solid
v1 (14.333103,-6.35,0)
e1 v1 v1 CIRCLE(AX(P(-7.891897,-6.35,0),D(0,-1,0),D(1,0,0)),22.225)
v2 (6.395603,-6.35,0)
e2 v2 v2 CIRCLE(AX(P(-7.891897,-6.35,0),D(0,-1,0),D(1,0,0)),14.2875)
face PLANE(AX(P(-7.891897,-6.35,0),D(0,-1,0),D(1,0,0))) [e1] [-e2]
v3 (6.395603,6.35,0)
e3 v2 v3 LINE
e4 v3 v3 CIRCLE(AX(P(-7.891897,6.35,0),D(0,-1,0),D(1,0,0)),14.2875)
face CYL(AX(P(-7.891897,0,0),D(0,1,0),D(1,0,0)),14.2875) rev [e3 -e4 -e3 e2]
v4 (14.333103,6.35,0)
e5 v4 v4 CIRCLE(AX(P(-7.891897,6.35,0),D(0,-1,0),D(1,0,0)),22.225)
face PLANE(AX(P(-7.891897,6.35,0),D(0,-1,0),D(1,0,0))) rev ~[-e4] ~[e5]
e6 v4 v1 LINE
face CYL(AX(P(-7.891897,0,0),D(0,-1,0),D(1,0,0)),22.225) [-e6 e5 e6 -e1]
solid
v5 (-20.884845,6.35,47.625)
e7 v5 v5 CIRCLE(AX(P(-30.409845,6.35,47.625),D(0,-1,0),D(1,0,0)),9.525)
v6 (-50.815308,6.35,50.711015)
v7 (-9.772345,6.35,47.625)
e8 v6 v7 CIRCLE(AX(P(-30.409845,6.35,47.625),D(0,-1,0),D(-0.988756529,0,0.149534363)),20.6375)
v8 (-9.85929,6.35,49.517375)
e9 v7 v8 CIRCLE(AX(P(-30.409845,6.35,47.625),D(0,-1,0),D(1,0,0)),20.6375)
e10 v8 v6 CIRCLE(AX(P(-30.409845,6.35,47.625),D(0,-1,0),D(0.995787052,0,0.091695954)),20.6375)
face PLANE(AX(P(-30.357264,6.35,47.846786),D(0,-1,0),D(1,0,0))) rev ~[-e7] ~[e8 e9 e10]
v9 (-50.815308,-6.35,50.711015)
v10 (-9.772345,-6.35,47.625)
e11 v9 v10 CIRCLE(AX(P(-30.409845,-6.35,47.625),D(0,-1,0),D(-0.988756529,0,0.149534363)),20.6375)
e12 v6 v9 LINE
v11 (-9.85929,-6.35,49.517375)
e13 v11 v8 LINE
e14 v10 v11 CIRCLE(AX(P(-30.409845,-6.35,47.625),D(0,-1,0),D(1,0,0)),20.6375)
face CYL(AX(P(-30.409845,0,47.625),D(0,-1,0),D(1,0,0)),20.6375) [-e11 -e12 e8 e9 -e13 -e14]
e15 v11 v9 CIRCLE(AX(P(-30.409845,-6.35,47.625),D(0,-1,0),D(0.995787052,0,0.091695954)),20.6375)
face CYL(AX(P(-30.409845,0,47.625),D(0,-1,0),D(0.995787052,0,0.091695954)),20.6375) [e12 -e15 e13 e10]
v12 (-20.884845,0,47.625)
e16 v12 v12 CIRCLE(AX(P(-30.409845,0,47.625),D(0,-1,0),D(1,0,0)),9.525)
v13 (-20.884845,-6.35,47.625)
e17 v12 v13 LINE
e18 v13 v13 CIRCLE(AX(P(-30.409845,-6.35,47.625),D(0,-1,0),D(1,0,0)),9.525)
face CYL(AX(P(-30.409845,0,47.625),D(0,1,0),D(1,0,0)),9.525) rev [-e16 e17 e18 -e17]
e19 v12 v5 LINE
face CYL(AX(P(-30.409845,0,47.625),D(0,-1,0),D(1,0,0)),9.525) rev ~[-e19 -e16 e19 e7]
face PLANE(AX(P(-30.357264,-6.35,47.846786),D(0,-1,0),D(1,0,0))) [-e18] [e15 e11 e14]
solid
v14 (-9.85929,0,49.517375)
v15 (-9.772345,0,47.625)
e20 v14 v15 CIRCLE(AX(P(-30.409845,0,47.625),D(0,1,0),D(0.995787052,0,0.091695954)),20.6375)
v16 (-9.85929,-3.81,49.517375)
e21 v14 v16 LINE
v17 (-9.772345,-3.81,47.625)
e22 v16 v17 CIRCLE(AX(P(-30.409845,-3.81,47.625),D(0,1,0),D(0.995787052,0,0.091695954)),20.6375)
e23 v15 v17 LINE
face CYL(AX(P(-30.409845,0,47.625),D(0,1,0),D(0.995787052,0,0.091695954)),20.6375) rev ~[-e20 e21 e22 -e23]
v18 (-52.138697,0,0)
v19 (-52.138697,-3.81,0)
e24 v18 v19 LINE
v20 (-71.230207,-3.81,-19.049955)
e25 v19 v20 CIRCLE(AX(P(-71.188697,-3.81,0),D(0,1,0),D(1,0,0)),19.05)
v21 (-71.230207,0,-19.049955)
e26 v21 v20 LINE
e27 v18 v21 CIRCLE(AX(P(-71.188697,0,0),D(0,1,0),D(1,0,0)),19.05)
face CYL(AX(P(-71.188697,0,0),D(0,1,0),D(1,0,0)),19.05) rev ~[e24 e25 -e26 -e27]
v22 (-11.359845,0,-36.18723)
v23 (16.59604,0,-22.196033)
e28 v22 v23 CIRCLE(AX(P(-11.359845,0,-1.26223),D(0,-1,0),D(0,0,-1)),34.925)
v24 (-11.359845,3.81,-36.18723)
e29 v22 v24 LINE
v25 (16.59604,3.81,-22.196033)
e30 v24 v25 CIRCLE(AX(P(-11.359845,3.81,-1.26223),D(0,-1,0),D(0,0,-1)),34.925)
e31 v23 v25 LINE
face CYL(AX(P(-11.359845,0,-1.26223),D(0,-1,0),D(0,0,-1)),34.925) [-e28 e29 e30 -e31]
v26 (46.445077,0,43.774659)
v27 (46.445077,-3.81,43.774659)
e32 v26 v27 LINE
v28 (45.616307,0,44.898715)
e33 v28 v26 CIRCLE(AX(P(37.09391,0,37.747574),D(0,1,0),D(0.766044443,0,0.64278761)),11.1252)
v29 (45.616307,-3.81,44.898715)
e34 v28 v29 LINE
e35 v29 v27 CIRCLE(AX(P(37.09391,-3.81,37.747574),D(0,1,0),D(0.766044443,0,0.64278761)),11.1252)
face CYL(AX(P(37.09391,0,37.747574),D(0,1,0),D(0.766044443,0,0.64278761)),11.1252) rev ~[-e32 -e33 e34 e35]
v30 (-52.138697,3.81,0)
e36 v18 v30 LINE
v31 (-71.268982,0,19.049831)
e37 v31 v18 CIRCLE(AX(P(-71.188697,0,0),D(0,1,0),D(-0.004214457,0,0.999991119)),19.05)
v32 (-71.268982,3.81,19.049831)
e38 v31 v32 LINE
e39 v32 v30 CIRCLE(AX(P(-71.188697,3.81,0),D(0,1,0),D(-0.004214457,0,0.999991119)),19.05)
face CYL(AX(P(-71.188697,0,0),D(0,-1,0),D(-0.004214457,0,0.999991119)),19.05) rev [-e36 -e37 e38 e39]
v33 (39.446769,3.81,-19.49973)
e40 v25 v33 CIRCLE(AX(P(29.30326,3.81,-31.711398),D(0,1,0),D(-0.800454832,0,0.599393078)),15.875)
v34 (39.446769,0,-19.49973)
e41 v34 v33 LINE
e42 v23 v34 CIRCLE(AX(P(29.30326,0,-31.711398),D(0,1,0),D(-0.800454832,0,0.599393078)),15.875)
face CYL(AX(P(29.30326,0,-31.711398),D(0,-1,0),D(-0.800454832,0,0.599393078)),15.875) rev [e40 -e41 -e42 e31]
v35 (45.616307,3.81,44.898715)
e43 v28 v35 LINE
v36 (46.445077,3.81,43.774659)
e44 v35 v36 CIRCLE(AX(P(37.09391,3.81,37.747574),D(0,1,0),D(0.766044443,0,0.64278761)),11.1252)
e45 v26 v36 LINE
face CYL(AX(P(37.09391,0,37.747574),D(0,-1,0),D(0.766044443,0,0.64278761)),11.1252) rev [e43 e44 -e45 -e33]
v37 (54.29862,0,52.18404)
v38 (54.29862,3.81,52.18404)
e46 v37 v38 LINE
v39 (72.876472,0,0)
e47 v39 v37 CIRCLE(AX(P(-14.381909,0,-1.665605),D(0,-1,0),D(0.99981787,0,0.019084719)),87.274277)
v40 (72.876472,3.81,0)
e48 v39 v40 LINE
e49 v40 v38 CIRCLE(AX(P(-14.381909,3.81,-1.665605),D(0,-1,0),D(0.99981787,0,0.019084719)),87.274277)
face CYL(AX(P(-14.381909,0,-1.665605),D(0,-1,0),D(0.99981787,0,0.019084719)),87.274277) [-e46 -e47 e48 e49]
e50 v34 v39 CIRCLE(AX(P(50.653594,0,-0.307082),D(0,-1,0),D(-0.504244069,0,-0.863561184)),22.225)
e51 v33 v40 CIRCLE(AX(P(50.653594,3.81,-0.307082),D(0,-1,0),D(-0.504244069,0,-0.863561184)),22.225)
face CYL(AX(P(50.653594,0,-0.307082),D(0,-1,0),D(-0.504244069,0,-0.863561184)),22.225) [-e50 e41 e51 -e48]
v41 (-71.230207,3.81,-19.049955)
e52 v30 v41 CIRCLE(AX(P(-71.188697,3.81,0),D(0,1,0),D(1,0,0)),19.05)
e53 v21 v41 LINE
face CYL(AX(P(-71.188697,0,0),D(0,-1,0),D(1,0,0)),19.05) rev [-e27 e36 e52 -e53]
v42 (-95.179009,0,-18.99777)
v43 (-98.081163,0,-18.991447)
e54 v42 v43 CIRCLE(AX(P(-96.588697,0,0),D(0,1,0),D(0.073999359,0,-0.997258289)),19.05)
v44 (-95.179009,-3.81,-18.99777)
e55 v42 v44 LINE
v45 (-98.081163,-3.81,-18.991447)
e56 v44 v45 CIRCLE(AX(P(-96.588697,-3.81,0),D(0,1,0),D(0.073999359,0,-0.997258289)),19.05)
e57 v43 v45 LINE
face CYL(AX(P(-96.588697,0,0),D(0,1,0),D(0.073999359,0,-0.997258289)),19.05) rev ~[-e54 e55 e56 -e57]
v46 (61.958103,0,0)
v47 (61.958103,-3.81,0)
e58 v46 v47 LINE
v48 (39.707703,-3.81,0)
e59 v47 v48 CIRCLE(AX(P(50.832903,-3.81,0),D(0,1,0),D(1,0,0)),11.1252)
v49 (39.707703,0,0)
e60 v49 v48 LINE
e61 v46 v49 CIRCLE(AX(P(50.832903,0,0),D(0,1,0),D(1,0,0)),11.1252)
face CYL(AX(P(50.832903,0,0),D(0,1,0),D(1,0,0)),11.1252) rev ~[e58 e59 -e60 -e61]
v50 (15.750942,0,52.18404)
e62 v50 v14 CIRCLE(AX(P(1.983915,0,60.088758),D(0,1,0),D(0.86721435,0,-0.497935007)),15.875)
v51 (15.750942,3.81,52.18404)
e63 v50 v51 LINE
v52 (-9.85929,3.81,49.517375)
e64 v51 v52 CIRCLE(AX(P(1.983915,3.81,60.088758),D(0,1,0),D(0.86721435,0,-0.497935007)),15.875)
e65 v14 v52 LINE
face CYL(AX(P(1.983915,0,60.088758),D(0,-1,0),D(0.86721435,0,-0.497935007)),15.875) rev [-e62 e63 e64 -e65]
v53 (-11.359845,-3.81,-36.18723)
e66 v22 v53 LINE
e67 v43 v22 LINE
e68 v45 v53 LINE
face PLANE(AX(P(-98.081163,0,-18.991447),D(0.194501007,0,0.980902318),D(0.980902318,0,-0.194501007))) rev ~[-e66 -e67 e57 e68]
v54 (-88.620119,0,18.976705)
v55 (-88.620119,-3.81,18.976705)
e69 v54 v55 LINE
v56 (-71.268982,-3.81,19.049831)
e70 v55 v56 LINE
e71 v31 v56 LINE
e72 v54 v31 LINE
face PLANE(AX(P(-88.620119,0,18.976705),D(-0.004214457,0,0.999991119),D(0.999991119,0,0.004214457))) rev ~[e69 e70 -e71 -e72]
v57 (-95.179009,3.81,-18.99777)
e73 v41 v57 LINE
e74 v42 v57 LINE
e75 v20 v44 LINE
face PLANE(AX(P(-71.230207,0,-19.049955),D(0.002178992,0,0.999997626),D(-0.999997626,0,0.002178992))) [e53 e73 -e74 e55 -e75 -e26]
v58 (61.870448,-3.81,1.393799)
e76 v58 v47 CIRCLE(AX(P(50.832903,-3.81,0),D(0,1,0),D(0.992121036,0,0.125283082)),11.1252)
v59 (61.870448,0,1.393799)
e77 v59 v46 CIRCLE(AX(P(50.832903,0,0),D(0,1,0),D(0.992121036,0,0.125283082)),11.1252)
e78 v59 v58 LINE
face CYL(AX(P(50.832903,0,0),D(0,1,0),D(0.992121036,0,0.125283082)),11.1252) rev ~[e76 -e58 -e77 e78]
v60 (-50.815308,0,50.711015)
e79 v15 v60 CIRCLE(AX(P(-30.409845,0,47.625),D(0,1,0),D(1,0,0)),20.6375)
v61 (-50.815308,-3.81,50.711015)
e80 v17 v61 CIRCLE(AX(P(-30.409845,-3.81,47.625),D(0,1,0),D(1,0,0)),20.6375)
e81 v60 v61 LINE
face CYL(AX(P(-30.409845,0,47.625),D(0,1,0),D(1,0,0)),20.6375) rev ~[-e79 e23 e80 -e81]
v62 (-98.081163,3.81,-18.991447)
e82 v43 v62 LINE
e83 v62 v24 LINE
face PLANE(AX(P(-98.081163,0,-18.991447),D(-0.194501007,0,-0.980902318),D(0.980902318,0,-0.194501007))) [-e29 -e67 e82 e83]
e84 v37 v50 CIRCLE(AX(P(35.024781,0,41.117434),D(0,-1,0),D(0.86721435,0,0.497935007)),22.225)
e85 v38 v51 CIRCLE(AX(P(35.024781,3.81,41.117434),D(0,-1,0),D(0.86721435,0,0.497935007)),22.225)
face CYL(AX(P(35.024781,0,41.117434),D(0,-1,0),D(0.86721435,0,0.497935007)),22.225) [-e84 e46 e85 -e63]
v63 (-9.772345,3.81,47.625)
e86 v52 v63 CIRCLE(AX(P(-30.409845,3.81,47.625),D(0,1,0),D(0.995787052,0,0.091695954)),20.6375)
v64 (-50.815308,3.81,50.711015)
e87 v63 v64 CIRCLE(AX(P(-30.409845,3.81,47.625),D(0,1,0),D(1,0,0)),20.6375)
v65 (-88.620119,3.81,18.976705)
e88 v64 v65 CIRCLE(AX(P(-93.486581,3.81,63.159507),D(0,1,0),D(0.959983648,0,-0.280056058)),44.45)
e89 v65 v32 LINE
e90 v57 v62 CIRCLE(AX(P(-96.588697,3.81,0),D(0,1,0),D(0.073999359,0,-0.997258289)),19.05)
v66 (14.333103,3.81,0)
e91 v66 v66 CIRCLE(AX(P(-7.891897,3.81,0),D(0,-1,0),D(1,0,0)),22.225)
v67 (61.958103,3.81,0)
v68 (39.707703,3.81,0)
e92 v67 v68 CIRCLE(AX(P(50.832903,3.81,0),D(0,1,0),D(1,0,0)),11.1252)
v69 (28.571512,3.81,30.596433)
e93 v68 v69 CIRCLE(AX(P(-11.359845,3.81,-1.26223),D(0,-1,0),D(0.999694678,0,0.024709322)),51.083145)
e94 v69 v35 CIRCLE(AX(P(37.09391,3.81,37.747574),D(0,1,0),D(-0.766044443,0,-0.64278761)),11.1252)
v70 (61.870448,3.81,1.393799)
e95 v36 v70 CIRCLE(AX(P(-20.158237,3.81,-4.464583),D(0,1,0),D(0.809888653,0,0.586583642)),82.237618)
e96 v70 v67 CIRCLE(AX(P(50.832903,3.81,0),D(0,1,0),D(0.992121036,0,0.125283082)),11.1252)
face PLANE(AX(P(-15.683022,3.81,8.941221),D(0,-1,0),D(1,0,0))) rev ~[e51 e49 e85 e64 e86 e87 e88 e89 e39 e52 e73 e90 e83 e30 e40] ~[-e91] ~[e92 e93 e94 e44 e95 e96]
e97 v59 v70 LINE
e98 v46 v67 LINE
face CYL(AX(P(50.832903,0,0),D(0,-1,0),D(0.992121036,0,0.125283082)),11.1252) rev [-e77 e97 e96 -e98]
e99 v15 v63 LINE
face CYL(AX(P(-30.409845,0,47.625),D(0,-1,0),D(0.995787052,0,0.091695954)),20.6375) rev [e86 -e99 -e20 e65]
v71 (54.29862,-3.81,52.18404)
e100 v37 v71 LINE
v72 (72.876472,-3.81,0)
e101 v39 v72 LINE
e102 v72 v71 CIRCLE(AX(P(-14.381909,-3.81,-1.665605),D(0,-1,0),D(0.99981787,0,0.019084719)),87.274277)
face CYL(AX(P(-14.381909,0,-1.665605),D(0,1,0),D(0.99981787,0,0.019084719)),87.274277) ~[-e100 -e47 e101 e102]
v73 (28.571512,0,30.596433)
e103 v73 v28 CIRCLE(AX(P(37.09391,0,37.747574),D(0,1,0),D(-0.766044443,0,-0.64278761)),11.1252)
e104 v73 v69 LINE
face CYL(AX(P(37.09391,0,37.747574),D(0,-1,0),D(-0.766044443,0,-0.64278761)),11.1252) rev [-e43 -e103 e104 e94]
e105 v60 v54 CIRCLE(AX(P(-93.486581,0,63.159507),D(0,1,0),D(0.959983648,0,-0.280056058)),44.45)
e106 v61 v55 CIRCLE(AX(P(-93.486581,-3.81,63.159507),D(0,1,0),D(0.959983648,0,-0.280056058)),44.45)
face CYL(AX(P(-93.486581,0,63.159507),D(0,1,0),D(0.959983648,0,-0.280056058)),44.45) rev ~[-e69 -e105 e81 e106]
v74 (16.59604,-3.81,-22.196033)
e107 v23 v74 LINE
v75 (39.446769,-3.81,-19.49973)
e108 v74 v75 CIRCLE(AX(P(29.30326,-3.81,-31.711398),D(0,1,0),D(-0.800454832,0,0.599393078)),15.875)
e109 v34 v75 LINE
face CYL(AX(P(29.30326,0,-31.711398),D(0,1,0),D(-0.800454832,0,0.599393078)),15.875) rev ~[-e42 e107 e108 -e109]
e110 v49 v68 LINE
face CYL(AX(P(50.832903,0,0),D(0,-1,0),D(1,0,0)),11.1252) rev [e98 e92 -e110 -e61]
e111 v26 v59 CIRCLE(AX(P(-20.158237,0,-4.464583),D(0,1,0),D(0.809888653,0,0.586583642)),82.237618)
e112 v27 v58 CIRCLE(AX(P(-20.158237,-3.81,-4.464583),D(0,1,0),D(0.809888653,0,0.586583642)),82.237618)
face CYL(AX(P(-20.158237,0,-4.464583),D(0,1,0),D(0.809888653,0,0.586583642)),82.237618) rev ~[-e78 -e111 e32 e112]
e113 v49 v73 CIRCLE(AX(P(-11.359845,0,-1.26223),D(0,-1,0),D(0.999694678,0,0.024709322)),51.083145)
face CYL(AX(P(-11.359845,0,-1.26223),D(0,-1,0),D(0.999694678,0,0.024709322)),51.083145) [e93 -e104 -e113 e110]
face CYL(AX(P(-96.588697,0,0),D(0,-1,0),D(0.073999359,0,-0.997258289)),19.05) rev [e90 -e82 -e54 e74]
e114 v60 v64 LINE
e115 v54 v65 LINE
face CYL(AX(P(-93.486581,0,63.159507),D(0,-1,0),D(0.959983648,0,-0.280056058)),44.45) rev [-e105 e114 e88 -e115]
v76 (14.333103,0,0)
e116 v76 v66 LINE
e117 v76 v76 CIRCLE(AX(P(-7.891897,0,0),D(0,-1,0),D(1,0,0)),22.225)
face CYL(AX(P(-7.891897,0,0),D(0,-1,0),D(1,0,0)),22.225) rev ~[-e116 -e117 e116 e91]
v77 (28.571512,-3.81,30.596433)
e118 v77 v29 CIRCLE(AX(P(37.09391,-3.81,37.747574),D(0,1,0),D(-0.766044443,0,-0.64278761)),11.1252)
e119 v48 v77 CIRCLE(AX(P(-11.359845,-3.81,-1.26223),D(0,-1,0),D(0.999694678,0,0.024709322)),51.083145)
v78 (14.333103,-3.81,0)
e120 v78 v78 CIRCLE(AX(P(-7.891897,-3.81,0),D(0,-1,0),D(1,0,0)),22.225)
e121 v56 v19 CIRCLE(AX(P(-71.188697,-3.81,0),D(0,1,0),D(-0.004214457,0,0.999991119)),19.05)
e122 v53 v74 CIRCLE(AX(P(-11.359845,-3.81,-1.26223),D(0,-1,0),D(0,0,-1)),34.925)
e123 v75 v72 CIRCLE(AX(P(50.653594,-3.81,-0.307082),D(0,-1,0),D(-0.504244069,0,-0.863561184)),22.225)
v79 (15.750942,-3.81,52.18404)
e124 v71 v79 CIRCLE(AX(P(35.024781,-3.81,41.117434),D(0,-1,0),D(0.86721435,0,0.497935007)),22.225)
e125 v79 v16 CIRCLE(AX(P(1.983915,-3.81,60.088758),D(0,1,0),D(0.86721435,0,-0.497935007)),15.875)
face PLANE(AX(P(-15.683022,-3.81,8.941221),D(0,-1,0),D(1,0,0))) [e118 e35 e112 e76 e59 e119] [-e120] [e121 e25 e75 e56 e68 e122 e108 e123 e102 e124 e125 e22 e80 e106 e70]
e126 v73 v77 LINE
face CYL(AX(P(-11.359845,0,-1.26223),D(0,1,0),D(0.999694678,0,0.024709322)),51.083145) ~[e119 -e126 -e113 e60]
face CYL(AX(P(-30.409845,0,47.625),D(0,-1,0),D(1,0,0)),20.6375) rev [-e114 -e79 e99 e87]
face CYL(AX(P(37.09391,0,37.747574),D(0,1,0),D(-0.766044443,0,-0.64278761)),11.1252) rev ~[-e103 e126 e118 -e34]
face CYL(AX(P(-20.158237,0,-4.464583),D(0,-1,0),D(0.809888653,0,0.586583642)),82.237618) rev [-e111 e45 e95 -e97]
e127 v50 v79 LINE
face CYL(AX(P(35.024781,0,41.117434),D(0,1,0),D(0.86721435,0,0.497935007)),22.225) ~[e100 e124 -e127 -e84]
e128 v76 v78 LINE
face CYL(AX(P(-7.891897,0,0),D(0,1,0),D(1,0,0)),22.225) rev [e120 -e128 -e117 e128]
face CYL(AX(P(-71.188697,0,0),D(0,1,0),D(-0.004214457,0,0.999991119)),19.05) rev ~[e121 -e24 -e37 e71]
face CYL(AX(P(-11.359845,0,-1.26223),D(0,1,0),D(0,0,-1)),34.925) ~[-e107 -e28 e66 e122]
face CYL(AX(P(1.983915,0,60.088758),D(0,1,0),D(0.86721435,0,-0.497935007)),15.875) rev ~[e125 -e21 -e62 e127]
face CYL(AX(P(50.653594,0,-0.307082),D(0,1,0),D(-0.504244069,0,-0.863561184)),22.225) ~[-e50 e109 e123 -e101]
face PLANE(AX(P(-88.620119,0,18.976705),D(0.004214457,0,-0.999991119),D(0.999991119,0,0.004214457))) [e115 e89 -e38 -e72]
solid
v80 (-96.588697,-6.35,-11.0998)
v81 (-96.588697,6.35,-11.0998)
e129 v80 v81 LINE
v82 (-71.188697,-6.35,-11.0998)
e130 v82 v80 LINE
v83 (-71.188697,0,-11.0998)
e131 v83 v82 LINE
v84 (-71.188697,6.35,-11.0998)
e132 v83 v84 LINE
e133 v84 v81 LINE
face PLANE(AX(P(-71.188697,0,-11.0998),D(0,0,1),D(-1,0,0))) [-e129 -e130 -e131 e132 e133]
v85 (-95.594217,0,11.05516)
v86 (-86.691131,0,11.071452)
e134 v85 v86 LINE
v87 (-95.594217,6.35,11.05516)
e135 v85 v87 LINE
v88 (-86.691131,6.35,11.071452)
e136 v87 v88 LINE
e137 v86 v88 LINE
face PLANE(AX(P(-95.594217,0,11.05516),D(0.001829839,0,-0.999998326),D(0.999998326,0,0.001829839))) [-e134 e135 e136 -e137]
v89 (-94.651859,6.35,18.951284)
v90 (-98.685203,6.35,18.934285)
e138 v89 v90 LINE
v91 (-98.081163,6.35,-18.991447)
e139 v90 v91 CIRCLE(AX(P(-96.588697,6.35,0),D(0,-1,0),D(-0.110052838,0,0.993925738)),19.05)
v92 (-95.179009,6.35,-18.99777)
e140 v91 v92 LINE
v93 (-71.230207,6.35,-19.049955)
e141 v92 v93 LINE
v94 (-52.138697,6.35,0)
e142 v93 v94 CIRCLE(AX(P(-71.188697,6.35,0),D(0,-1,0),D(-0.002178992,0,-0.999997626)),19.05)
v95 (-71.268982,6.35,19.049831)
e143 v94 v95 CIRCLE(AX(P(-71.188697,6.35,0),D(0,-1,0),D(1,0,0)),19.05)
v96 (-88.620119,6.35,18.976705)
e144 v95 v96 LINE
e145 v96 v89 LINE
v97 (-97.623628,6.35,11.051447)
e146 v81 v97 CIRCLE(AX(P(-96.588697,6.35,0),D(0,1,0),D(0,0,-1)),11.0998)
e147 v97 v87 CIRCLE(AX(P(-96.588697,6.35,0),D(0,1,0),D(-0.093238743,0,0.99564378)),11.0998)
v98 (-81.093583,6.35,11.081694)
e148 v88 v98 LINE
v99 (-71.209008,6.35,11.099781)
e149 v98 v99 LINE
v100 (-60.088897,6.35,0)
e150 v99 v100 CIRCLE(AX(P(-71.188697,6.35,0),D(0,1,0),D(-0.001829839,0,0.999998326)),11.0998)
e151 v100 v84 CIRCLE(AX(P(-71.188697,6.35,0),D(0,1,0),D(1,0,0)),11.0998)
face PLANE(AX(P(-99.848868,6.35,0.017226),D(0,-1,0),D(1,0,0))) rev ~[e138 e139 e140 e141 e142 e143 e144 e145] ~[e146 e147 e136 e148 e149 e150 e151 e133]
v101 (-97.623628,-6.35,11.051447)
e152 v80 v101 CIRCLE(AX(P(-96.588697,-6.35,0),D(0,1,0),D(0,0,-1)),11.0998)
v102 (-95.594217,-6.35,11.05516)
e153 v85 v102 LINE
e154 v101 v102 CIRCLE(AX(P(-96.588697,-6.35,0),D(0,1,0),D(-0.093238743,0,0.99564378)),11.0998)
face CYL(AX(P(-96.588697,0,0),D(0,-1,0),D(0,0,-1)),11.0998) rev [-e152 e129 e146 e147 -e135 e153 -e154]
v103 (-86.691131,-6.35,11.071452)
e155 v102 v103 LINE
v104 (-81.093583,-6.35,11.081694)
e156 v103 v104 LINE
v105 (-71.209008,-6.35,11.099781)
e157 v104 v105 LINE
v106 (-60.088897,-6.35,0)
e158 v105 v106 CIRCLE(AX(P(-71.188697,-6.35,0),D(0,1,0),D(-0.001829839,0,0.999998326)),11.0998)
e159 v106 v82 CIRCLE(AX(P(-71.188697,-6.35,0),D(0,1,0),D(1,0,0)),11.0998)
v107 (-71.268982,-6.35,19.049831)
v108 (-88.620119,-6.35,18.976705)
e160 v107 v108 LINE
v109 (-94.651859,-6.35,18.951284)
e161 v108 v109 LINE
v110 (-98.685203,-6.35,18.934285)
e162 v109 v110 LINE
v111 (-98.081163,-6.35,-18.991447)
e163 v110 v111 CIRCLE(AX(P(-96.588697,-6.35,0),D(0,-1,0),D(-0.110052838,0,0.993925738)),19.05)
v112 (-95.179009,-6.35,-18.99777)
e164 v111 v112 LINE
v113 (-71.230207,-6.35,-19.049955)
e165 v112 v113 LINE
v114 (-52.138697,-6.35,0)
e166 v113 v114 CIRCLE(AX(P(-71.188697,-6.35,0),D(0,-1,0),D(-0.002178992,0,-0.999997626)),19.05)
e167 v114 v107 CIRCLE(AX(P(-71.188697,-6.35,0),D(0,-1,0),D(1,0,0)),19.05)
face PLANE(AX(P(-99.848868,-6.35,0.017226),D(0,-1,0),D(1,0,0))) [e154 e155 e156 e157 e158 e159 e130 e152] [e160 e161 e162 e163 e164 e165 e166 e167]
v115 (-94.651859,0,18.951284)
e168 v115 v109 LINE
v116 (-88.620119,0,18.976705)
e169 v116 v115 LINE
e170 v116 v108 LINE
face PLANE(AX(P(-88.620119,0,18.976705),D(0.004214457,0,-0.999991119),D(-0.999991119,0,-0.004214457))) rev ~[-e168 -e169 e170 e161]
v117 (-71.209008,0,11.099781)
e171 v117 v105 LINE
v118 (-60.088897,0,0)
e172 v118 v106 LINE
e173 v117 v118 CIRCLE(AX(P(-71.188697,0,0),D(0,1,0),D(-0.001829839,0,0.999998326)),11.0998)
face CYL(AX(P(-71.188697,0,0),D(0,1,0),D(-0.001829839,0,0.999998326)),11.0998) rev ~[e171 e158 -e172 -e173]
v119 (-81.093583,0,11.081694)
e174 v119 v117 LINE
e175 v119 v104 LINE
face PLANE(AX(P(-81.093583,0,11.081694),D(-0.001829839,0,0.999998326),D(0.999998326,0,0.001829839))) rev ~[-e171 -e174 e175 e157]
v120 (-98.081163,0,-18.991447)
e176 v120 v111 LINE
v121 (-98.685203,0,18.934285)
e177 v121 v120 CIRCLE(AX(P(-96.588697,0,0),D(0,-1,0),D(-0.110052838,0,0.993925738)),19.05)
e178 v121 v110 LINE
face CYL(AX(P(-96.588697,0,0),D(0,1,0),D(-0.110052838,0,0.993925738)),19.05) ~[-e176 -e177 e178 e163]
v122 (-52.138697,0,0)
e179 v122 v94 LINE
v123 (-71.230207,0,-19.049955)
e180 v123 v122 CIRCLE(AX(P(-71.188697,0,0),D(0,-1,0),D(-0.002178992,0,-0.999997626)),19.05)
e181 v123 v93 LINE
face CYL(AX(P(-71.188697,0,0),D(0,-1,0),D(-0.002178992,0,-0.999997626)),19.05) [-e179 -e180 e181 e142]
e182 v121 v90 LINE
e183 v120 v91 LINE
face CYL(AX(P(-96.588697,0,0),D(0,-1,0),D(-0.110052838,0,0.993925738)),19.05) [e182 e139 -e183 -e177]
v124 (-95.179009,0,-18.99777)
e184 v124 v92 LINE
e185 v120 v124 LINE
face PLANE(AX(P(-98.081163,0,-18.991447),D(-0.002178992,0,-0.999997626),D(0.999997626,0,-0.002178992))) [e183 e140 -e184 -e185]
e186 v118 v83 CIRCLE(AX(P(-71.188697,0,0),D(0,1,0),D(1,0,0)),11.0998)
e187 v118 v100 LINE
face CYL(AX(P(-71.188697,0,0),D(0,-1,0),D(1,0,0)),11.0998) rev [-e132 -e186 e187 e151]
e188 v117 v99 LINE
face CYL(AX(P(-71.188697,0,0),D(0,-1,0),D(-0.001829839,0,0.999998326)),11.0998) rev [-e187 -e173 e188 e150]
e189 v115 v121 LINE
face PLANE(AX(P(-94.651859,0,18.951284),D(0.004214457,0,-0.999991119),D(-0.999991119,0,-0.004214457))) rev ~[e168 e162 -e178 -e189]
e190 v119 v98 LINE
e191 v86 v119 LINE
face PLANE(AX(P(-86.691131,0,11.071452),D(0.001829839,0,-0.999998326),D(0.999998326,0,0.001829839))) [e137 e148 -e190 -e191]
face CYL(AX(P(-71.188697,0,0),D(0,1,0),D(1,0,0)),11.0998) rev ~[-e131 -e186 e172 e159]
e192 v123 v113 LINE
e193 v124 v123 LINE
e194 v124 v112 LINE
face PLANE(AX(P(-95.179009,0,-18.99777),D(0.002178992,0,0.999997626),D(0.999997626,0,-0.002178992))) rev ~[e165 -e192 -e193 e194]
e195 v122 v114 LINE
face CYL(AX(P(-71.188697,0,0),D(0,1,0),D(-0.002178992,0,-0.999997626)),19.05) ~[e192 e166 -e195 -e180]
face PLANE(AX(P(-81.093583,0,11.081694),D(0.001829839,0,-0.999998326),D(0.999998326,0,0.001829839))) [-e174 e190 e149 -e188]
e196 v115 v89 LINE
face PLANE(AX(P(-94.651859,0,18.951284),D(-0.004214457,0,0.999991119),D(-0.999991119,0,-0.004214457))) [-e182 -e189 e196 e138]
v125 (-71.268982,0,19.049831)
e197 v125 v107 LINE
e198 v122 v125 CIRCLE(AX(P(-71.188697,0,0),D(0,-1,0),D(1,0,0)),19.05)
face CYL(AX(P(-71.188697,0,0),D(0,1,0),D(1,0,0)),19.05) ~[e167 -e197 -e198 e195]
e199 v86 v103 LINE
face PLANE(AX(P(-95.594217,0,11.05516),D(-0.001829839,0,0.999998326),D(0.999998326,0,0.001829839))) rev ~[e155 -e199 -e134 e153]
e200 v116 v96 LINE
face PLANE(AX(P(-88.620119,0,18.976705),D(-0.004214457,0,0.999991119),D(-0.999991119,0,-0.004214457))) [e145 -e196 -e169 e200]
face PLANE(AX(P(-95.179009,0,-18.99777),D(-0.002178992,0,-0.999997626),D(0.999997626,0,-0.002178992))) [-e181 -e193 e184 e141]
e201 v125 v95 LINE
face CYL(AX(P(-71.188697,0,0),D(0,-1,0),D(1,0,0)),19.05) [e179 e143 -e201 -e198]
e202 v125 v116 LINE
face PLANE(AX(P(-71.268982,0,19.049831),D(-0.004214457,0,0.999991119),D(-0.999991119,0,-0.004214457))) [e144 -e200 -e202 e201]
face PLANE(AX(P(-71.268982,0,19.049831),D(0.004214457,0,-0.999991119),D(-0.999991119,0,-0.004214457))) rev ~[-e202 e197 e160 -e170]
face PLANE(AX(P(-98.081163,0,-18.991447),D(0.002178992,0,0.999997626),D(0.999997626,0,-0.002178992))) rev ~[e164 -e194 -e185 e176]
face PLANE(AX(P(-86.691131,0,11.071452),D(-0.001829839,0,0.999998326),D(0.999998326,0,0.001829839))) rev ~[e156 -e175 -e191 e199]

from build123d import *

# Parameters (mm, degrees)
F0_R     = 22.225
F1_DEPTH = 3.81
F2_DEPTH = 6.35
F0_R_2   = 9.525
F0_R_3   = 14.2875


with BuildPart() as f1:
    # F0 (on Front) → F1 (new body, symmetric)
    with BuildSketch(Plane.XZ):
        with BuildLine():
            Line((-71.2302067148, -19.0499547752), (-95.1790091363, -18.9977704048))
            ThreePointArc((-95.1790091363, -18.9977704048), (-96.6302067148, -19.0499547752), (-98.0811630947, -18.9914466199))
            Line((-98.0811630947, -18.9914466199), (-11.3598450249, -36.1872298845))
            ThreePointArc((-11.3598450249, -36.1872298845), (4.2709346458, -32.4941742986), (16.5960399757, -22.1960331421))
            ThreePointArc((16.5960399757, -22.1960331421), (27.4429735853, -15.9457724279), (39.4467694666, -19.4997296822))
            ThreePointArc((39.4467694666, -19.4997296822), (61.8517288175, -19.5048009495), (72.8764723136, 0))
            ThreePointArc((72.8764723136, 0), (67.8374893071, 27.6050269049), (54.2986201889, 52.1840399681))
            ThreePointArc((54.2986201889, 52.1840399681), (35.0247812601, 63.3424344385), (15.7509423313, 52.1840399681))
            ThreePointArc((15.7509423313, 52.1840399681), (3.628009846, 44.2991231357), (-9.8592897487, 49.517375251))
            ThreePointArc((-9.8592897487, 49.517375251), (-9.7940926646, 48.5721857626), (-9.7723450249, 47.625))
            ThreePointArc((-9.7723450249, 47.625), (-31.9572082975, 27.0455910398), (-50.8153078986, 50.7110154181))
            ThreePointArc((-50.8153078986, 50.7110154181), (-64.9081681748, 29.1142899479), (-88.6201192568, 18.9767045507))
            Line((-88.6201192568, 18.9767045507), (-71.2689823238, 19.0498308196))
            ThreePointArc((-71.2689823238, 19.0498308196), (-57.7467278848, 13.4987395145), (-52.1386969191, 0))
            ThreePointArc((-52.1386969191, 0), (-57.7329966699, -13.4850521246), (-71.2302067148, -19.0499547752))
        make_face()
        with Locations((-7.8918969191, 0)):
            Circle(F0_R, mode=Mode.SUBTRACT)
        with BuildLine():
            ThreePointArc((61.9581030809, 0), (50.8329030809, -11.1252), (39.7077030809, 0))
            ThreePointArc((39.7077030809, 0), (36.6426092928, 16.2092346589), (28.5715121556, 30.596433106))
            ThreePointArc((28.5715121556, 30.596433106), (29.9427690789, 46.2699714599), (45.6163074327, 44.8987145366))
            ThreePointArc((45.6163074327, 44.8987145366), (46.0483474014, 44.3497039456), (46.4450767121, 43.7746587147))
            ThreePointArc((46.4450767121, 43.7746587147), (57.1198457607, 23.6623392132), (61.8704480271, 1.3937993402))
            ThreePointArc((61.8704480271, 1.3937993402), (61.9361676926, 0.6982764512), (61.9581030809, 0))
        make_face(mode=Mode.SUBTRACT)
    extrude(amount=F1_DEPTH, both=True)


with BuildPart() as f2:
    # F0 (on Front) → F2 (new body, symmetric)
    with BuildSketch(Plane.XZ):
        with BuildLine():
            ThreePointArc((-96.5886969191, -11.0998), (-107.6764020371, -0.5180301702), (-97.6236283177, 11.0514468302))
            ThreePointArc((-97.6236283177, 11.0514468302), (-96.6090077674, 11.0997814172), (-95.5942171229, 11.0551603324))
            Line((-95.5942171229, 11.0551603324), (-86.6911309222, 11.0714515751))
            ThreePointArc((-86.6911309222, 11.0714515751), (-85.3763591725, 12.7126999407), (-83.8886969191, 14.1990316571))
            ThreePointArc((-83.8886969191, 14.1990316571), (-88.8942032902, 17.4269121704), (-94.6518588651, 18.9512838181))
            Line((-94.6518588651, 18.9512838181), (-98.6852034909, 18.9342853098))
            ThreePointArc((-98.6852034909, 18.9342853098), (-115.6362812002, -0.3033695006), (-98.0811630947, -18.9914466199))
            Line((-98.0811630947, -18.9914466199), (-95.1790091363, -18.9977704048))
            ThreePointArc((-95.1790091363, -18.9977704048), (-89.1369994129, -17.5321049585), (-83.8886969191, -14.1990316571))
            ThreePointArc((-83.8886969191, -14.1990316571), (-85.3647221317, -12.7256751951), (-86.6708459935, -11.0998))
            Line((-86.6708459935, -11.0998), (-96.5886969191, -11.0998))
        make_face()
        with BuildLine():
            Line((-81.1065478448, -11.0998), (-86.6708459935, -11.0998))
            ThreePointArc((-86.6708459935, -11.0998), (-85.3647221317, -12.7256751951), (-83.8886969191, -14.1990316571))
            ThreePointArc((-83.8886969191, -14.1990316571), (-82.4126717065, -12.7256751951), (-81.1065478448, -11.0998))
        make_face()
        with BuildLine():
            ThreePointArc((-83.8886969191, 14.1990316571), (-85.3763591725, 12.7126999407), (-86.6911309222, 11.0714515751))
            Line((-86.6911309222, 11.0714515751), (-81.0935830583, 11.0816942043))
            ThreePointArc((-81.0935830583, 11.0816942043), (-82.4052361424, 12.7173873258), (-83.8886969191, 14.1990316571))
        make_face()
        with BuildLine():
            Line((-71.1886969191, -11.0998), (-81.1065478448, -11.0998))
            ThreePointArc((-81.1065478448, -11.0998), (-82.4126717065, -12.7256751951), (-83.8886969191, -14.1990316571))
            ThreePointArc((-83.8886969191, -14.1990316571), (-78.0055423584, -17.7885670659), (-71.2302067148, -19.0499547752))
            ThreePointArc((-71.2302067148, -19.0499547752), (-57.7329966699, -13.4850521246), (-52.1386969191, 0))
            ThreePointArc((-52.1386969191, 0), (-57.7467278848, 13.4987395145), (-71.2689823238, 19.0498308196))
            ThreePointArc((-71.2689823238, 19.0498308196), (-78.0236429237, 17.7816200925), (-83.8886969191, 14.1990316571))
            ThreePointArc((-83.8886969191, 14.1990316571), (-82.4052361424, 12.7173873258), (-81.0935830583, 11.0816942043))
            Line((-81.0935830583, 11.0816942043), (-71.2090077674, 11.0997814172))
            ThreePointArc((-71.2090077674, 11.0997814172), (-63.3471373266, 7.8559215371), (-60.0888969191, 0))
            ThreePointArc((-60.0888969191, 0), (-63.3399530693, -7.8487438498), (-71.1886969191, -11.0998))
        make_face()
        with BuildLine():
            ThreePointArc((-71.2302067148, -19.0499547752), (-78.0055423584, -17.7885670659), (-83.8886969191, -14.1990316571))
            ThreePointArc((-83.8886969191, -14.1990316571), (-89.1369994129, -17.5321049585), (-95.1790091363, -18.9977704048))
            Line((-95.1790091363, -18.9977704048), (-71.2302067148, -19.0499547752))
        make_face()
        with BuildLine():
            ThreePointArc((-94.6518588651, 18.9512838181), (-88.8942032902, 17.4269121704), (-83.8886969191, 14.1990316571))
            ThreePointArc((-83.8886969191, 14.1990316571), (-78.0236429237, 17.7816200925), (-71.2689823238, 19.0498308196))
            Line((-71.2689823238, 19.0498308196), (-88.6201192568, 18.9767045507))
            Line((-88.6201192568, 18.9767045507), (-94.6518588651, 18.9512838181))
        make_face()
    extrude(amount=F2_DEPTH, both=True)


with BuildPart() as f2b:
    # F0 (on Front) → F2, piece 2 (new body, symmetric)
    with BuildSketch(Plane.XZ):
        with BuildLine():
            ThreePointArc((-9.8592897487, 49.517375251), (-29.8086319483, 68.2537408507), (-50.8153078986, 50.7110154181))
            ThreePointArc((-50.8153078986, 50.7110154181), (-31.9572082975, 27.0455910398), (-9.7723450249, 47.625))
            ThreePointArc((-9.7723450249, 47.625), (-9.7940926646, 48.5721857626), (-9.8592897487, 49.517375251))
        make_face()
        with Locations((-30.4098450249, 47.625)):
            Circle(F0_R_2, mode=Mode.SUBTRACT)
    extrude(amount=F2_DEPTH, both=True)


with BuildPart() as f2c:
    # F0 (on Front) → F2, piece 3 (new body, symmetric)
    with BuildSketch(Plane.XZ):
        with Locations((-7.8918969191, 0)):
            Circle(F0_R)
        with Locations((-7.8918969191, 0)):
            Circle(F0_R_3, mode=Mode.SUBTRACT)
    extrude(amount=F2_DEPTH, both=True)


solid = Compound([f1.part, f2.part, f2b.part, f2c.part])
